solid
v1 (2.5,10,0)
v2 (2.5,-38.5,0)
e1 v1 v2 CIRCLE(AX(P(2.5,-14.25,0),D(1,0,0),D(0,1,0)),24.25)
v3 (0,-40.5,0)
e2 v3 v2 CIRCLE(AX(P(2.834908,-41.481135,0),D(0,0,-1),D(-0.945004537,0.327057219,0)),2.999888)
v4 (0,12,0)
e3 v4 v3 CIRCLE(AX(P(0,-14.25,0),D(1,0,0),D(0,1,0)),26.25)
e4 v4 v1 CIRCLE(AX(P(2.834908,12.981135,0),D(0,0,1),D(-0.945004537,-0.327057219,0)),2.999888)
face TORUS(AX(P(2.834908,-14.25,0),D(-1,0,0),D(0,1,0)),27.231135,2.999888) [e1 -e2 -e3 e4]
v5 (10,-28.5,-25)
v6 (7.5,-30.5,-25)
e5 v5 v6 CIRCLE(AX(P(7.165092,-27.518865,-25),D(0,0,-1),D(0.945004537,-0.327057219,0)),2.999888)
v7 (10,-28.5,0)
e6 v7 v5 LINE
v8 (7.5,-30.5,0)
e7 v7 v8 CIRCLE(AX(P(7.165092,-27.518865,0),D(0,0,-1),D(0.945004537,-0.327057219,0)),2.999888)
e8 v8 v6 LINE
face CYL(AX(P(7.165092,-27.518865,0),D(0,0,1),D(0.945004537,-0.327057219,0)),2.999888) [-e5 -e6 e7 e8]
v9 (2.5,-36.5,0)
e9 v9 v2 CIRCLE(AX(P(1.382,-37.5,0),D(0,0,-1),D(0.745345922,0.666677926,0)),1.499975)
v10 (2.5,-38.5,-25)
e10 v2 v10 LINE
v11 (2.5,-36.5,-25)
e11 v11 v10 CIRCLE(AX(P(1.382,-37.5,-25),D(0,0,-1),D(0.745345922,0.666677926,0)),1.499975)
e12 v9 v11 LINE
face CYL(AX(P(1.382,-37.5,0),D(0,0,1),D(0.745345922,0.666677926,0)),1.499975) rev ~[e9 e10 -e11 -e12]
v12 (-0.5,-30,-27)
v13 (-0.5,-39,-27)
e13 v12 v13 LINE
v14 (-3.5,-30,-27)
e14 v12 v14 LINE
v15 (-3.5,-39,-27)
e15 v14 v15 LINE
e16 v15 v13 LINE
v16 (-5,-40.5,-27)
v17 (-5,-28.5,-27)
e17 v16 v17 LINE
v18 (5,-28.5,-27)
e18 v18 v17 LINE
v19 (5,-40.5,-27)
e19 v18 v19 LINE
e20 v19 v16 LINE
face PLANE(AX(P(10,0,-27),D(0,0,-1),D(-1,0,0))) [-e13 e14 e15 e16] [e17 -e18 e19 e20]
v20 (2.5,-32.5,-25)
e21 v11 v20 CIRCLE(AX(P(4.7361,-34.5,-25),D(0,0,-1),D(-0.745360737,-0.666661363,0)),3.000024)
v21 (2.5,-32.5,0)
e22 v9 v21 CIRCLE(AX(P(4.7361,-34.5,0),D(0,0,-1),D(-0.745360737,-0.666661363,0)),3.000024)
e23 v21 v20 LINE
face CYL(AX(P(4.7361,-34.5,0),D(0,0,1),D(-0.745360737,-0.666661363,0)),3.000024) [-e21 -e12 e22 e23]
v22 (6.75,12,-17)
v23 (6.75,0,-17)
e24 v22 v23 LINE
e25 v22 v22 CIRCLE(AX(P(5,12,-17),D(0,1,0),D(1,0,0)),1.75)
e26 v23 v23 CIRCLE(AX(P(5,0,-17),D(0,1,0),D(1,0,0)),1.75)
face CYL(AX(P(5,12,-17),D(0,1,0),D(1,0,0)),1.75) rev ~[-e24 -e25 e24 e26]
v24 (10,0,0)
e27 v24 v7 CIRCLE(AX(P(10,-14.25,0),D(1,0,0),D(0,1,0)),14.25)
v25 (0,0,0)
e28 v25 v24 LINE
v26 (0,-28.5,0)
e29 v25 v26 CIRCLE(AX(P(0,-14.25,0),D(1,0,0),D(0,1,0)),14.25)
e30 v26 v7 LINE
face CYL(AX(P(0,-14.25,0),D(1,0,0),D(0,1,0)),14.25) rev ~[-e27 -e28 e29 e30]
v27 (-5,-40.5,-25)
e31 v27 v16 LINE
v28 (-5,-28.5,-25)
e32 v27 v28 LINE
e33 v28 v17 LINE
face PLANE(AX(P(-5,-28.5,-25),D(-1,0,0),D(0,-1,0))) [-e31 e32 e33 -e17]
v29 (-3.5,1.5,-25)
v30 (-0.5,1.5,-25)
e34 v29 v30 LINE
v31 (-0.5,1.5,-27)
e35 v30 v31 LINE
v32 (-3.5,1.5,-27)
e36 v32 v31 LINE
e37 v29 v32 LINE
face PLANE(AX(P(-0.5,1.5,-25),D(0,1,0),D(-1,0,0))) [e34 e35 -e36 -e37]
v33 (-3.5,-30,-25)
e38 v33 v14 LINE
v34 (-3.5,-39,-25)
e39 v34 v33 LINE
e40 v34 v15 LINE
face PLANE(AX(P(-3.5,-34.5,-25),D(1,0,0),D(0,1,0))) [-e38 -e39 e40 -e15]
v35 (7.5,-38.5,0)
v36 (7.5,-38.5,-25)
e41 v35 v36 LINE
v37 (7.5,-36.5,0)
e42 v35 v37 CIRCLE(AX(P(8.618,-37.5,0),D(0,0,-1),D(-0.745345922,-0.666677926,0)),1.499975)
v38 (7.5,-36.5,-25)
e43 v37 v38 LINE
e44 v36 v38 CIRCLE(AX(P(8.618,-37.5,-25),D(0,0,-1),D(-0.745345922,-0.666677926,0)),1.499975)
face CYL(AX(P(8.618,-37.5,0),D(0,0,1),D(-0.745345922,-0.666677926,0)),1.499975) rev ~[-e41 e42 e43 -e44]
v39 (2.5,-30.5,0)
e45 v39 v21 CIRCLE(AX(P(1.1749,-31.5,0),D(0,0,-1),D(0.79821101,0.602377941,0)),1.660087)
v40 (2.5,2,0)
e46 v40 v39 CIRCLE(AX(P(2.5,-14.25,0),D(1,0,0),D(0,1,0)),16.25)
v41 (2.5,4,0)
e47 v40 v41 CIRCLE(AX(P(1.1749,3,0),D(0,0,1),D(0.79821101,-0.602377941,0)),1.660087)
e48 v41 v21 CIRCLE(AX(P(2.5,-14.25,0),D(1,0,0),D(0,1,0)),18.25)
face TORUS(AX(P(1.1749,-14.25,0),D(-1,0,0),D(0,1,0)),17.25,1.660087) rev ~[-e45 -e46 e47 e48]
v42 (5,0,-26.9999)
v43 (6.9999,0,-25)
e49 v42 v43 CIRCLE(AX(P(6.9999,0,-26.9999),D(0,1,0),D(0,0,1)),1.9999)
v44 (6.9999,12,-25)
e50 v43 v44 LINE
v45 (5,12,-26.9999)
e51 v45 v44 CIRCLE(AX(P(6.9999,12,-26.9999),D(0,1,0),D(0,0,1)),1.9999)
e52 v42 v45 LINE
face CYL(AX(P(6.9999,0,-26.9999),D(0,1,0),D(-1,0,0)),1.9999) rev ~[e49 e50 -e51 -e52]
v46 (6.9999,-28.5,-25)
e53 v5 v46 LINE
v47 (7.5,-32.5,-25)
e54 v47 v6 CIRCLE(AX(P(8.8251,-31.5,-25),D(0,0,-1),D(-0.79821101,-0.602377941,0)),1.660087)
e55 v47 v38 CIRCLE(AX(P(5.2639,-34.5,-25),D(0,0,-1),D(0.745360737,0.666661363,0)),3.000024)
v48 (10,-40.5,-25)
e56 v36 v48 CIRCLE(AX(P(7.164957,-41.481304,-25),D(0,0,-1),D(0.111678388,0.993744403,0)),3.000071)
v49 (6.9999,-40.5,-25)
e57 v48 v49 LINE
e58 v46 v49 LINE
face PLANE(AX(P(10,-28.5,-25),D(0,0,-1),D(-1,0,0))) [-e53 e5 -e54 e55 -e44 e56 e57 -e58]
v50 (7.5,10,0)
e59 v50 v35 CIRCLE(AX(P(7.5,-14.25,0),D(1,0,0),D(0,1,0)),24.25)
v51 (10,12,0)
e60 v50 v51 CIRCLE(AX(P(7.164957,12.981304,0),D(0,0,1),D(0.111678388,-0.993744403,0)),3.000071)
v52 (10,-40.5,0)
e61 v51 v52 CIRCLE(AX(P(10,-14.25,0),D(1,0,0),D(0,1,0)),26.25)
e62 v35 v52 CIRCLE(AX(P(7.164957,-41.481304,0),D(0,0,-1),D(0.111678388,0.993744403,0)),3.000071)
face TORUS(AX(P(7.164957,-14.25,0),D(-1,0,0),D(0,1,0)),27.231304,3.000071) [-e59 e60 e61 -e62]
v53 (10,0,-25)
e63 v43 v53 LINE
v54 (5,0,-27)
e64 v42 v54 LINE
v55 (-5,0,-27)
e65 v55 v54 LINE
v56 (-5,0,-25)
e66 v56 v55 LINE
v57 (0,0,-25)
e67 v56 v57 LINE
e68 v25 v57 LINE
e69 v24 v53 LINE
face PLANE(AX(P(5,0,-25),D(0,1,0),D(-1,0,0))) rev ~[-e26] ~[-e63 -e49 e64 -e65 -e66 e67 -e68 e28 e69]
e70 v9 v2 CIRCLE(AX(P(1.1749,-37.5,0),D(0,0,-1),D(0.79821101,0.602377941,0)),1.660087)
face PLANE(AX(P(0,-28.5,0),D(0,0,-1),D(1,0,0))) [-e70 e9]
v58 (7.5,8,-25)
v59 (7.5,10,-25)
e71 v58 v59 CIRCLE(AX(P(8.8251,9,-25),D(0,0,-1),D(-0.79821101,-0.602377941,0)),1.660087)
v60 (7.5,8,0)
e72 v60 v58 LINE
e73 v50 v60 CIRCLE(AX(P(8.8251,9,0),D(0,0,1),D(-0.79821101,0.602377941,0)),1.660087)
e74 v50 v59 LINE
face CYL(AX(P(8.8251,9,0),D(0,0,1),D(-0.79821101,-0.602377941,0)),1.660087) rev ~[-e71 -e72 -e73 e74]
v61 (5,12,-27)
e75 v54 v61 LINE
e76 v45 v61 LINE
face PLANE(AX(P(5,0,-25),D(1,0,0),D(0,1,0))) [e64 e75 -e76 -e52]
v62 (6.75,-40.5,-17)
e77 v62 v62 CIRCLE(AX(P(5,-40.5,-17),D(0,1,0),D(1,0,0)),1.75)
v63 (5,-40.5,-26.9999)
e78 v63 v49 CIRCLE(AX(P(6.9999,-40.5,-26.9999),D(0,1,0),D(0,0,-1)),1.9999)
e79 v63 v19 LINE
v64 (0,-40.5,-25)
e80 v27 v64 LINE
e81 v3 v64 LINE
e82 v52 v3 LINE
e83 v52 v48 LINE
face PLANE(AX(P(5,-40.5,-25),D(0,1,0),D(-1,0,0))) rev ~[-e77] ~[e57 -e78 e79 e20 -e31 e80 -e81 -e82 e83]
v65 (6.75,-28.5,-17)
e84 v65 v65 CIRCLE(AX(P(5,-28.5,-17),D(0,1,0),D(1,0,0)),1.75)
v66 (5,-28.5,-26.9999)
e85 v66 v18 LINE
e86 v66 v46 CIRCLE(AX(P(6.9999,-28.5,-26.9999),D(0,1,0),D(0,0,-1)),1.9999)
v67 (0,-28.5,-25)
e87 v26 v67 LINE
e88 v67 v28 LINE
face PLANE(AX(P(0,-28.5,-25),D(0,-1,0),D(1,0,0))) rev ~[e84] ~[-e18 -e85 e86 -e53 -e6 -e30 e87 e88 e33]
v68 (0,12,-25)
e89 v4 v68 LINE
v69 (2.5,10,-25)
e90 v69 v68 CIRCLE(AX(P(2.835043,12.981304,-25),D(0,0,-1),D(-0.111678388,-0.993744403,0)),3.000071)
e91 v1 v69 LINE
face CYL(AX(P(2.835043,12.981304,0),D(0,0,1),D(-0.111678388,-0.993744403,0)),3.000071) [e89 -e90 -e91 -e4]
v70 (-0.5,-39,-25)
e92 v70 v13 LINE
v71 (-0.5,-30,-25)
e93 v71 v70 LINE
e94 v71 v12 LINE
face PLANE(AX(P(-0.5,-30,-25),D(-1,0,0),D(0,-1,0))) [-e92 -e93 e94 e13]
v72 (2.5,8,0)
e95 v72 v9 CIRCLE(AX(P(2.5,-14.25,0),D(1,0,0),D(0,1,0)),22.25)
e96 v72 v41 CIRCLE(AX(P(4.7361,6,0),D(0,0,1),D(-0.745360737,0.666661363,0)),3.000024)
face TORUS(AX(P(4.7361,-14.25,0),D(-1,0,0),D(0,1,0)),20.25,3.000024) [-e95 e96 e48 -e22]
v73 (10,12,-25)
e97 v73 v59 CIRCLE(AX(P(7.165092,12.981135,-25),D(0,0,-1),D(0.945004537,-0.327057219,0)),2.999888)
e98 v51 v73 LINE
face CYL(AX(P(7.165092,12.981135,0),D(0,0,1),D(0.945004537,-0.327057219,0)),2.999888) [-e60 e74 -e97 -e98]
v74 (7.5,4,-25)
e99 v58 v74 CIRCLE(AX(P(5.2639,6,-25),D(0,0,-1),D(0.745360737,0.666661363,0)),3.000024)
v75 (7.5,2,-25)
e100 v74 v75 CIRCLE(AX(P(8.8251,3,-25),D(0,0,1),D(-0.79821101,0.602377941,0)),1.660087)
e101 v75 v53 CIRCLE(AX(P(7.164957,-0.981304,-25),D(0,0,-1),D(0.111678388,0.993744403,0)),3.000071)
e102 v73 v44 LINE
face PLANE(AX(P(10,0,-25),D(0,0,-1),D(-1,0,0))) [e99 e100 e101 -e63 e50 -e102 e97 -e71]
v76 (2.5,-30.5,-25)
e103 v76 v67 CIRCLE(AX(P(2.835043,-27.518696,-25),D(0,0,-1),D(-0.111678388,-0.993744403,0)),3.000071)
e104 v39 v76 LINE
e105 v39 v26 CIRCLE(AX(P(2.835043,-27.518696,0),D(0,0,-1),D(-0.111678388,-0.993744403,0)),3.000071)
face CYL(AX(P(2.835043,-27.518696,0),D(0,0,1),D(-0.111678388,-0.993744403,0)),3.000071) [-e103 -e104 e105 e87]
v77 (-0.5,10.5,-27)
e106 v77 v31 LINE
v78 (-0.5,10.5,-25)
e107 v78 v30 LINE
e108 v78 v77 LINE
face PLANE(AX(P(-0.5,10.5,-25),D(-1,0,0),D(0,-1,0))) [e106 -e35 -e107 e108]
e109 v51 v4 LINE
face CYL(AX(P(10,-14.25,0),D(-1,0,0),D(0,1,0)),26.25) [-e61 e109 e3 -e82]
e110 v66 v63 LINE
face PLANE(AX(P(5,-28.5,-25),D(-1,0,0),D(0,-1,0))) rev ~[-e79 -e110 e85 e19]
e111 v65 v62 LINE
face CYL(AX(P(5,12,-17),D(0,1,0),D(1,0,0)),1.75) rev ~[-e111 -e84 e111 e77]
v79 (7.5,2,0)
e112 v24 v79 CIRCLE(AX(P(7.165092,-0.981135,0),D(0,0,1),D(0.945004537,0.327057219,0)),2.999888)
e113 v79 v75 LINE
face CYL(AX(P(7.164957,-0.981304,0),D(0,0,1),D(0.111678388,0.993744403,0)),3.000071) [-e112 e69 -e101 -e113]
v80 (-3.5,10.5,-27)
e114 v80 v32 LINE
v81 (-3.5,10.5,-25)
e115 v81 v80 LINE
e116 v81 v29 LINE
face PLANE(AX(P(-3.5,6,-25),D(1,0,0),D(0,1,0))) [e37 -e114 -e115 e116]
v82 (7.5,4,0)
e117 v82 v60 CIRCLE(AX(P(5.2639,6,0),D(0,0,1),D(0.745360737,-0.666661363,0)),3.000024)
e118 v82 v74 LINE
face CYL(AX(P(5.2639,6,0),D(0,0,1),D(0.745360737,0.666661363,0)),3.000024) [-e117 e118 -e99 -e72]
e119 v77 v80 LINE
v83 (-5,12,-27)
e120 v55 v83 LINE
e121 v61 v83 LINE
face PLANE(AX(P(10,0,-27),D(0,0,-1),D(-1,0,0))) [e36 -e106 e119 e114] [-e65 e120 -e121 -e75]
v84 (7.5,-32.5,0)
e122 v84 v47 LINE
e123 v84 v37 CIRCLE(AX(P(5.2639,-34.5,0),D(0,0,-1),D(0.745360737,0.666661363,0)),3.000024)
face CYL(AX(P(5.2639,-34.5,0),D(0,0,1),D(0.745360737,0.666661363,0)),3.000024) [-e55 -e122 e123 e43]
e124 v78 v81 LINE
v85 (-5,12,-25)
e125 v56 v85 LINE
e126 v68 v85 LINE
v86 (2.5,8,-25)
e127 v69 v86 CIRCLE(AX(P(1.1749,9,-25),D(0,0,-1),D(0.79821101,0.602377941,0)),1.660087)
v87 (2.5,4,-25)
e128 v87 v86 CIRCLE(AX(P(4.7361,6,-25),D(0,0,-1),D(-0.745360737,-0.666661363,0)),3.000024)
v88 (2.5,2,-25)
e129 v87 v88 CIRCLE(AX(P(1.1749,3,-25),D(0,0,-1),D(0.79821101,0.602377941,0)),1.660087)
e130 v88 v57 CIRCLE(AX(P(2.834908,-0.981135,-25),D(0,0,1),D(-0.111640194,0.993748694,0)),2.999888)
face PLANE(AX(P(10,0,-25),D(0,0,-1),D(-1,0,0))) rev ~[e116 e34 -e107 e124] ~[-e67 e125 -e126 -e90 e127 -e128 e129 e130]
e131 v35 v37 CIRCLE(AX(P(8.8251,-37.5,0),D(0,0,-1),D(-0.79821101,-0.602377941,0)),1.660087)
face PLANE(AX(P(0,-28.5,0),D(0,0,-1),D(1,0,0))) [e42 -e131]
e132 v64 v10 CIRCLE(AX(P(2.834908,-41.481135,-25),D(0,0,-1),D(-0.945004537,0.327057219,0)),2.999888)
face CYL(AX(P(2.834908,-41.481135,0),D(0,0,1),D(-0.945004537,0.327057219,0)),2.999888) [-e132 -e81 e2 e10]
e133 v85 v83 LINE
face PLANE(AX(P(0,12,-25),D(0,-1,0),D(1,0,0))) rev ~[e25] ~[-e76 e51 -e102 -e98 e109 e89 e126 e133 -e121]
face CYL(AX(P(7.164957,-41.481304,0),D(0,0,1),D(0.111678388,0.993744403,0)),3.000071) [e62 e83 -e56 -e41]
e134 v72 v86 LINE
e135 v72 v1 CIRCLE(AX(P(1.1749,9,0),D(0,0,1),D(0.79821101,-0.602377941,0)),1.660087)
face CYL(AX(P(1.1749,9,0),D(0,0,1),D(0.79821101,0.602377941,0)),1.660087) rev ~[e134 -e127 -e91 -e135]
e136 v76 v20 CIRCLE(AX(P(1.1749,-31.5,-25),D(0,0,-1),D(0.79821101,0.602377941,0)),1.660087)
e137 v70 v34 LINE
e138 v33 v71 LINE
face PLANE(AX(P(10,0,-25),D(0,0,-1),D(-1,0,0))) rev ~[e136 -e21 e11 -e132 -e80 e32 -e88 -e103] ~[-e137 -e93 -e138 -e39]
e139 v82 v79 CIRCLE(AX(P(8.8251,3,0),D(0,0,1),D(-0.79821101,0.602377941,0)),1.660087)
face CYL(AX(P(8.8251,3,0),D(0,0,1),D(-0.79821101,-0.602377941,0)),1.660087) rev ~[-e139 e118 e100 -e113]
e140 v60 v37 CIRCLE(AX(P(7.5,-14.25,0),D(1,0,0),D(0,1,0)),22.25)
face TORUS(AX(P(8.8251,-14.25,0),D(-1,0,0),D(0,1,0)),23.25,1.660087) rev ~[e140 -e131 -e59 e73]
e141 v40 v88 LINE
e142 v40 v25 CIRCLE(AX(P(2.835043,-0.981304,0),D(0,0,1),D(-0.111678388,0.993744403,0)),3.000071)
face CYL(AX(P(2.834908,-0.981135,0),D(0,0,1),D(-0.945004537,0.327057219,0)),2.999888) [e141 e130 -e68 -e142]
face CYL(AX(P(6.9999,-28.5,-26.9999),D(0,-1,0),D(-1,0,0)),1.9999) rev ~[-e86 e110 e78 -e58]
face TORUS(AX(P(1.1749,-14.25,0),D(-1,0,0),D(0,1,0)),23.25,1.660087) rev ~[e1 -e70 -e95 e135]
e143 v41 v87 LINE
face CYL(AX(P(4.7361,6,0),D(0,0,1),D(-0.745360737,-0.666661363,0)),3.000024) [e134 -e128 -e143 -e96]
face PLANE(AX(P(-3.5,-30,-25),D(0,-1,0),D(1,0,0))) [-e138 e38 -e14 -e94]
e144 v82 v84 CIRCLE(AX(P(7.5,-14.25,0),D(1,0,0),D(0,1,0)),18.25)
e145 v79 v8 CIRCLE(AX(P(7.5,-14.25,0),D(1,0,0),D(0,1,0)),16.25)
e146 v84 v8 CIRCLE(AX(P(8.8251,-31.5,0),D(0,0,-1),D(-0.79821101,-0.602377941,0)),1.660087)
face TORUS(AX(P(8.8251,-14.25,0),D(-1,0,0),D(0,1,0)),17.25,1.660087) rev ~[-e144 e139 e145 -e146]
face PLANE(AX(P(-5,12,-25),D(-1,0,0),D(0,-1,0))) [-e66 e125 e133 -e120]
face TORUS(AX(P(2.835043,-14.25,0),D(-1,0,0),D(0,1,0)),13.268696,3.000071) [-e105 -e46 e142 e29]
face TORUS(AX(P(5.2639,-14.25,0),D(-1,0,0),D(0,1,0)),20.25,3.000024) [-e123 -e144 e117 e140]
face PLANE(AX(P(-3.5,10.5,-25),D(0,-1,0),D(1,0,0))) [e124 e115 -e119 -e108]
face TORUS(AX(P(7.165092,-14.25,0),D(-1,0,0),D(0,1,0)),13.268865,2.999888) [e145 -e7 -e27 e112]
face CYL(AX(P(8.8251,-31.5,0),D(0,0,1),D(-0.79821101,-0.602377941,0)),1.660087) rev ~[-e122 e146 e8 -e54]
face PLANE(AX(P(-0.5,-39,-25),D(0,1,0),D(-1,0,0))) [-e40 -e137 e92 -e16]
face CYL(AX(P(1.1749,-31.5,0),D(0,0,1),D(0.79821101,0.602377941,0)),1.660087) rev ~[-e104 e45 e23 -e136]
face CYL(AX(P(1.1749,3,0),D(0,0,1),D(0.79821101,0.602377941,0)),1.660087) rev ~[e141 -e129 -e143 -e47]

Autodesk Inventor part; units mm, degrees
ref_plane "YZ Plane" through (0, 0, 0) normal (1, 0, 0) x (0, 1, 0)
ref_plane "XZ Plane" through (0, 0, 0) normal (0, 1, 0) x (-1, 0, 0)
ref_plane "XY Plane" through (0, 0, 0) normal (0, 0, 1) x (1, 0, 0)
sketch "Szkic1" plane through (0, 0, 0) normal (0, 0, 1) x (1, 0, 0)
  line L0 (0, 0) -> (10, 0)
  line L1 (10, 12) -> (0, 12)
  arc A0 (10, 0) -> (7.5, 2) centre (7.165, -0.9812) ccw
  arc A1 (2.5, 2) -> (0, 0) centre (2.835, -0.9812) ccw
  arc A2 (7.5, 10) -> (10, 12) centre (7.165, 12.9812) ccw
  arc A3 (0, 12) -> (2.5, 10) centre (2.835, 12.9812) ccw
  arc A4 (7.5, 4) -> (7.5, 2) centre (8.8251, 3) ccw
  arc A5 (2.5, 2) -> (2.5, 4) centre (1.1749, 3) ccw
  arc A6 (7.5, 10) -> (7.5, 8) centre (8.8251, 9) ccw
  arc A7 (2.5, 8) -> (2.5, 10) centre (1.1749, 9) ccw
  arc A8 (7.5, 4) -> (7.5, 8) centre (5.2639, 6) ccw
  arc A9 (2.5, 8) -> (2.5, 4) centre (4.7361, 6) ccw
  line L2 (-1.9818, -14.25) -> (12.2979, -14.25)
  dimension "d0" = 10
  dimension "d5" = 3
  dimension "d7" = 3
  dimension "d10" = 3
  dimension "d11" = 3
  dimension "d12" = 3
  dimension "d13" = 3
revolve "Obrót1" add sketch "Szkic1" angle 180 about axis through (-1.9818, -14.25, 0) along (1, 0, 0)
sketch "Szkic2" plane through (10, 0, 0) normal (0, 0, -1) x (-1, 0, 0)
  line L0 (10, 0) -> (0, 0) projected
  line L1 (0, 0) -> (10, 0)
  line L2 (0, 12) -> (10, 12) projected
  line L3 (0, 12) -> (10, 12)
  arc A0 (7.5, 10) -> (7.5, 8) centre (8.8251, 9) ccw projected
  line L4 (10, 12) -> (10, -40.5) projected
  arc A1 (2.5, 8) -> (2.5, 10) centre (1.1749, 9) ccw projected
  arc A2 (2.5, 8) -> (2.5, 4) centre (4.7361, 6) ccw projected
  arc A3 (2.5, 8) -> (2.5, 10) centre (1.175, 9) ccw
  arc A4 (7.5, 4) -> (7.5, 8) centre (5.2639, 6) ccw projected
  arc A5 (7.5, 10) -> (7.5, 8) centre (8.8251, 9) ccw
  arc A6 (7.5, 4) -> (7.5, 2) centre (8.8251, 3) ccw projected
  arc A7 (7.5, 4) -> (7.5, 8) centre (5.2639, 6) ccw
  line L5 (8.2639, 6) -> (8.2639, -34.5) projected
  arc A8 (2.5, 8) -> (2.5, 4) centre (4.7361, 6) ccw
  arc A9 (2.5, 2) -> (0, 0) centre (2.835, -0.9812) ccw projected
  arc A10 (2.5, 2) -> (2.5, 4) centre (1.1749, 3) ccw
  line L6 (2.835, 3) -> (2.835, -31.5) projected
  arc A11 (7.5, 4) -> (7.5, 2) centre (8.8251, 3) ccw
  arc A12 (2.5, 2) -> (0, 0) centre (2.835, -0.9812) ccw
  arc A13 (10, 0) -> (7.5, 2) centre (7.165, -0.9812) ccw projected
  arc A14 (10, 0) -> (7.5, 2) centre (7.165, -0.9812) ccw
  arc A15 (7.5, 10) -> (10, 12) centre (7.165, 12.9812) ccw
  arc A16 (7.5, 10) -> (10, 12) centre (7.165, 12.9812) ccw projected
  arc A17 (0, 12) -> (2.5, 10) centre (2.835, 12.9812) ccw
  arc A18 (0, 12) -> (2.5, 10) centre (2.835, 12.9812) ccw projected
  dimension "d16" = 1.66
extrude "Wyciągnięcie proste1" add sketch "Szkic2" along normal blind 25 contours L0 L5 A13 | L0 L6 A10 A2 A1 A17 L2 A15 A0 A4 A6 A13 L5 | L0 A9 A10 L6
sketch "Szkic3" plane through (10, -28.5, 0) normal (0, 0, -1) x (-1, 0, 0)
  line L0 (10, 0) -> (0, 0) projected
  line L1 (0, 0) -> (10, 0)
  arc A0 (2.5, -10) -> (0, -12) centre (2.835, -12.9812) ccw projected
  line L2 (0, -12) -> (10, -12) projected
  line L3 (0, -12) -> (10, -12)
  arc A1 (10, -12) -> (7.5, -10) centre (7.165, -12.9812) ccw projected
  arc A2 (10, -12) -> (7.5, -10) centre (7.165, -12.9812) ccw
  arc A3 (2.5, -10) -> (2.5, -8) centre (1.1749, -9) ccw projected
  arc A4 (2.5, -10) -> (0, -12) centre (2.835, -12.9812) ccw
  arc A5 (0, 0) -> (2.5, -2) centre (2.835, 0.9812) ccw projected
  arc A6 (2.5, -4) -> (2.5, -2) centre (1.1749, -3) ccw projected
  arc A7 (0, 0) -> (2.5, -2) centre (2.835, 0.9812) ccw
  line L4 (7.5, 30.5) -> (7.5, -2) projected
  arc A8 (7.5, -2) -> (10, 0) centre (7.165, 0.9812) ccw projected
  arc A9 (7.5, -2) -> (10, 0) centre (7.165, 0.9812) ccw
  arc A10 (7.5, -2) -> (7.5, -4) centre (8.8251, -3) ccw projected
  arc A11 (7.5, -2) -> (7.5, -4) centre (8.8251, -3) ccw
  arc A12 (2.5, -4) -> (2.5, -2) centre (1.1749, -3) ccw
  arc A13 (2.5, -4) -> (2.5, -8) centre (4.7361, -6) ccw projected
  arc A14 (2.5, -4) -> (2.5, -8) centre (4.7361, -6) ccw
  arc A15 (7.5, -8) -> (7.5, -4) centre (5.2639, -6) ccw projected
  arc A16 (7.5, -8) -> (7.5, -4) centre (5.2639, -6) ccw
  line L5 (7.5, 38.5) -> (7.5, -10) projected
  arc A17 (7.5, -8) -> (7.5, -10) centre (8.618, -9) ccw
  arc A18 (2.5, -10) -> (2.5, -8) centre (1.382, -9) ccw
  point P0 (10, 28.5)
extrude "Wyciągnięcie proste2" add sketch "Szkic3" along normal blind 25 contours A8 L4 L0 | L4 A10 L5 A17 A1 L2 A0 A18 A13 A6 A5 L0 | A15 L5
sketch "Szkic4" plane through (0, 12, 0) normal (0, 1, 0) x (1, 0, 0)
  line L0 (0, 0) -> (10, 0) projected
  circle A0 centre (5, 17) radius 1.75
  dimension "d22" = 3.5
extrude "Wyciągnięcie proste3" cut sketch "Szkic4" against normal blind 250
sketch "Szkic5" plane through (0, 12, 0) normal (0, 1, 0) x (1, 0, 0)
  point P0 (0, 0)
sketch "Szkic6" plane through (10, 0, -25) normal (0, 0, -1) x (-1, 0, 0)
  line L0 (10, 12) -> (0, 12) projected
  line L1 (5, 12) -> (5, -40.5)
  line L2 (0, -40.5) -> (10, -40.5) projected
  line L3 (10, -28.5) -> (0, -28.5) projected
  line L4 (5, -28.5) -> (15, -28.5)
  line L5 (15, -28.5) -> (15, -40.5)
  line L6 (15, -40.5) -> (5, -40.5)
  line L7 (0, 0) -> (10, 0) projected
  line L8 (5, 0) -> (15, 0)
  line L9 (15, 0) -> (15, 12)
  line L10 (15, 12) -> (5, 12)
  line L11 (15, -34.5) -> (12, -34.5)
  line L12 (12, -34.5) -> (12, -30)
  line L13 (12, -34.5) -> (12, -39)
  line L14 (13.5, -30) -> (10.5, -30)
  line L15 (10.5, -30) -> (10.5, -39)
  line L16 (10.5, -39) -> (13.5, -39)
  line L17 (13.5, -39) -> (13.5, -30)
  dimension "d25" = 10
  dimension "d26" = 3
  dimension "d27" = 4.5
  dimension "d28" = 4.5
  dimension "d29" = 3
extrude "Wyciągnięcie proste4" add sketch "Szkic6" along normal blind 2 contours L3 L4 L5 L6 L2 L1
sketch "Szkic7" plane through (10, 0, -25) normal (0, 0, -1) x (-1, 0, 0)
  line L0 (0, 0) -> (10, 0) projected
  line L1 (5, 0) -> (5, 12)
  line L2 (10, 12) -> (0, 12) projected
  line L3 (5, 12) -> (15, 12)
  line L4 (15, 12) -> (15, 0)
  line L5 (15, 0) -> (5, 0)
  line L6 (15, 6) -> (12, 6)
  line L7 (12, 6) -> (12, 10.5)
  line L8 (12, 6) -> (12, 1.5)
  line L9 (13.5, 10.5) -> (10.5, 10.5)
  line L10 (10.5, 10.5) -> (10.5, 1.5)
  line L11 (10.5, 1.5) -> (13.5, 1.5)
  line L12 (13.5, 1.5) -> (13.5, 10.5)
  dimension "d32" = 10
  dimension "d33" = 3
  dimension "d34" = 4.5
  dimension "d35" = 4.5
  dimension "d36" = 3
extrude "Wyciągnięcie proste5" add sketch "Szkic7" along normal blind 2
fillet "Zaokrąglenie1" radius 2 2 edges at (5, 6, -25) (5, -34.5, -25)
properties part number "obejma2"
